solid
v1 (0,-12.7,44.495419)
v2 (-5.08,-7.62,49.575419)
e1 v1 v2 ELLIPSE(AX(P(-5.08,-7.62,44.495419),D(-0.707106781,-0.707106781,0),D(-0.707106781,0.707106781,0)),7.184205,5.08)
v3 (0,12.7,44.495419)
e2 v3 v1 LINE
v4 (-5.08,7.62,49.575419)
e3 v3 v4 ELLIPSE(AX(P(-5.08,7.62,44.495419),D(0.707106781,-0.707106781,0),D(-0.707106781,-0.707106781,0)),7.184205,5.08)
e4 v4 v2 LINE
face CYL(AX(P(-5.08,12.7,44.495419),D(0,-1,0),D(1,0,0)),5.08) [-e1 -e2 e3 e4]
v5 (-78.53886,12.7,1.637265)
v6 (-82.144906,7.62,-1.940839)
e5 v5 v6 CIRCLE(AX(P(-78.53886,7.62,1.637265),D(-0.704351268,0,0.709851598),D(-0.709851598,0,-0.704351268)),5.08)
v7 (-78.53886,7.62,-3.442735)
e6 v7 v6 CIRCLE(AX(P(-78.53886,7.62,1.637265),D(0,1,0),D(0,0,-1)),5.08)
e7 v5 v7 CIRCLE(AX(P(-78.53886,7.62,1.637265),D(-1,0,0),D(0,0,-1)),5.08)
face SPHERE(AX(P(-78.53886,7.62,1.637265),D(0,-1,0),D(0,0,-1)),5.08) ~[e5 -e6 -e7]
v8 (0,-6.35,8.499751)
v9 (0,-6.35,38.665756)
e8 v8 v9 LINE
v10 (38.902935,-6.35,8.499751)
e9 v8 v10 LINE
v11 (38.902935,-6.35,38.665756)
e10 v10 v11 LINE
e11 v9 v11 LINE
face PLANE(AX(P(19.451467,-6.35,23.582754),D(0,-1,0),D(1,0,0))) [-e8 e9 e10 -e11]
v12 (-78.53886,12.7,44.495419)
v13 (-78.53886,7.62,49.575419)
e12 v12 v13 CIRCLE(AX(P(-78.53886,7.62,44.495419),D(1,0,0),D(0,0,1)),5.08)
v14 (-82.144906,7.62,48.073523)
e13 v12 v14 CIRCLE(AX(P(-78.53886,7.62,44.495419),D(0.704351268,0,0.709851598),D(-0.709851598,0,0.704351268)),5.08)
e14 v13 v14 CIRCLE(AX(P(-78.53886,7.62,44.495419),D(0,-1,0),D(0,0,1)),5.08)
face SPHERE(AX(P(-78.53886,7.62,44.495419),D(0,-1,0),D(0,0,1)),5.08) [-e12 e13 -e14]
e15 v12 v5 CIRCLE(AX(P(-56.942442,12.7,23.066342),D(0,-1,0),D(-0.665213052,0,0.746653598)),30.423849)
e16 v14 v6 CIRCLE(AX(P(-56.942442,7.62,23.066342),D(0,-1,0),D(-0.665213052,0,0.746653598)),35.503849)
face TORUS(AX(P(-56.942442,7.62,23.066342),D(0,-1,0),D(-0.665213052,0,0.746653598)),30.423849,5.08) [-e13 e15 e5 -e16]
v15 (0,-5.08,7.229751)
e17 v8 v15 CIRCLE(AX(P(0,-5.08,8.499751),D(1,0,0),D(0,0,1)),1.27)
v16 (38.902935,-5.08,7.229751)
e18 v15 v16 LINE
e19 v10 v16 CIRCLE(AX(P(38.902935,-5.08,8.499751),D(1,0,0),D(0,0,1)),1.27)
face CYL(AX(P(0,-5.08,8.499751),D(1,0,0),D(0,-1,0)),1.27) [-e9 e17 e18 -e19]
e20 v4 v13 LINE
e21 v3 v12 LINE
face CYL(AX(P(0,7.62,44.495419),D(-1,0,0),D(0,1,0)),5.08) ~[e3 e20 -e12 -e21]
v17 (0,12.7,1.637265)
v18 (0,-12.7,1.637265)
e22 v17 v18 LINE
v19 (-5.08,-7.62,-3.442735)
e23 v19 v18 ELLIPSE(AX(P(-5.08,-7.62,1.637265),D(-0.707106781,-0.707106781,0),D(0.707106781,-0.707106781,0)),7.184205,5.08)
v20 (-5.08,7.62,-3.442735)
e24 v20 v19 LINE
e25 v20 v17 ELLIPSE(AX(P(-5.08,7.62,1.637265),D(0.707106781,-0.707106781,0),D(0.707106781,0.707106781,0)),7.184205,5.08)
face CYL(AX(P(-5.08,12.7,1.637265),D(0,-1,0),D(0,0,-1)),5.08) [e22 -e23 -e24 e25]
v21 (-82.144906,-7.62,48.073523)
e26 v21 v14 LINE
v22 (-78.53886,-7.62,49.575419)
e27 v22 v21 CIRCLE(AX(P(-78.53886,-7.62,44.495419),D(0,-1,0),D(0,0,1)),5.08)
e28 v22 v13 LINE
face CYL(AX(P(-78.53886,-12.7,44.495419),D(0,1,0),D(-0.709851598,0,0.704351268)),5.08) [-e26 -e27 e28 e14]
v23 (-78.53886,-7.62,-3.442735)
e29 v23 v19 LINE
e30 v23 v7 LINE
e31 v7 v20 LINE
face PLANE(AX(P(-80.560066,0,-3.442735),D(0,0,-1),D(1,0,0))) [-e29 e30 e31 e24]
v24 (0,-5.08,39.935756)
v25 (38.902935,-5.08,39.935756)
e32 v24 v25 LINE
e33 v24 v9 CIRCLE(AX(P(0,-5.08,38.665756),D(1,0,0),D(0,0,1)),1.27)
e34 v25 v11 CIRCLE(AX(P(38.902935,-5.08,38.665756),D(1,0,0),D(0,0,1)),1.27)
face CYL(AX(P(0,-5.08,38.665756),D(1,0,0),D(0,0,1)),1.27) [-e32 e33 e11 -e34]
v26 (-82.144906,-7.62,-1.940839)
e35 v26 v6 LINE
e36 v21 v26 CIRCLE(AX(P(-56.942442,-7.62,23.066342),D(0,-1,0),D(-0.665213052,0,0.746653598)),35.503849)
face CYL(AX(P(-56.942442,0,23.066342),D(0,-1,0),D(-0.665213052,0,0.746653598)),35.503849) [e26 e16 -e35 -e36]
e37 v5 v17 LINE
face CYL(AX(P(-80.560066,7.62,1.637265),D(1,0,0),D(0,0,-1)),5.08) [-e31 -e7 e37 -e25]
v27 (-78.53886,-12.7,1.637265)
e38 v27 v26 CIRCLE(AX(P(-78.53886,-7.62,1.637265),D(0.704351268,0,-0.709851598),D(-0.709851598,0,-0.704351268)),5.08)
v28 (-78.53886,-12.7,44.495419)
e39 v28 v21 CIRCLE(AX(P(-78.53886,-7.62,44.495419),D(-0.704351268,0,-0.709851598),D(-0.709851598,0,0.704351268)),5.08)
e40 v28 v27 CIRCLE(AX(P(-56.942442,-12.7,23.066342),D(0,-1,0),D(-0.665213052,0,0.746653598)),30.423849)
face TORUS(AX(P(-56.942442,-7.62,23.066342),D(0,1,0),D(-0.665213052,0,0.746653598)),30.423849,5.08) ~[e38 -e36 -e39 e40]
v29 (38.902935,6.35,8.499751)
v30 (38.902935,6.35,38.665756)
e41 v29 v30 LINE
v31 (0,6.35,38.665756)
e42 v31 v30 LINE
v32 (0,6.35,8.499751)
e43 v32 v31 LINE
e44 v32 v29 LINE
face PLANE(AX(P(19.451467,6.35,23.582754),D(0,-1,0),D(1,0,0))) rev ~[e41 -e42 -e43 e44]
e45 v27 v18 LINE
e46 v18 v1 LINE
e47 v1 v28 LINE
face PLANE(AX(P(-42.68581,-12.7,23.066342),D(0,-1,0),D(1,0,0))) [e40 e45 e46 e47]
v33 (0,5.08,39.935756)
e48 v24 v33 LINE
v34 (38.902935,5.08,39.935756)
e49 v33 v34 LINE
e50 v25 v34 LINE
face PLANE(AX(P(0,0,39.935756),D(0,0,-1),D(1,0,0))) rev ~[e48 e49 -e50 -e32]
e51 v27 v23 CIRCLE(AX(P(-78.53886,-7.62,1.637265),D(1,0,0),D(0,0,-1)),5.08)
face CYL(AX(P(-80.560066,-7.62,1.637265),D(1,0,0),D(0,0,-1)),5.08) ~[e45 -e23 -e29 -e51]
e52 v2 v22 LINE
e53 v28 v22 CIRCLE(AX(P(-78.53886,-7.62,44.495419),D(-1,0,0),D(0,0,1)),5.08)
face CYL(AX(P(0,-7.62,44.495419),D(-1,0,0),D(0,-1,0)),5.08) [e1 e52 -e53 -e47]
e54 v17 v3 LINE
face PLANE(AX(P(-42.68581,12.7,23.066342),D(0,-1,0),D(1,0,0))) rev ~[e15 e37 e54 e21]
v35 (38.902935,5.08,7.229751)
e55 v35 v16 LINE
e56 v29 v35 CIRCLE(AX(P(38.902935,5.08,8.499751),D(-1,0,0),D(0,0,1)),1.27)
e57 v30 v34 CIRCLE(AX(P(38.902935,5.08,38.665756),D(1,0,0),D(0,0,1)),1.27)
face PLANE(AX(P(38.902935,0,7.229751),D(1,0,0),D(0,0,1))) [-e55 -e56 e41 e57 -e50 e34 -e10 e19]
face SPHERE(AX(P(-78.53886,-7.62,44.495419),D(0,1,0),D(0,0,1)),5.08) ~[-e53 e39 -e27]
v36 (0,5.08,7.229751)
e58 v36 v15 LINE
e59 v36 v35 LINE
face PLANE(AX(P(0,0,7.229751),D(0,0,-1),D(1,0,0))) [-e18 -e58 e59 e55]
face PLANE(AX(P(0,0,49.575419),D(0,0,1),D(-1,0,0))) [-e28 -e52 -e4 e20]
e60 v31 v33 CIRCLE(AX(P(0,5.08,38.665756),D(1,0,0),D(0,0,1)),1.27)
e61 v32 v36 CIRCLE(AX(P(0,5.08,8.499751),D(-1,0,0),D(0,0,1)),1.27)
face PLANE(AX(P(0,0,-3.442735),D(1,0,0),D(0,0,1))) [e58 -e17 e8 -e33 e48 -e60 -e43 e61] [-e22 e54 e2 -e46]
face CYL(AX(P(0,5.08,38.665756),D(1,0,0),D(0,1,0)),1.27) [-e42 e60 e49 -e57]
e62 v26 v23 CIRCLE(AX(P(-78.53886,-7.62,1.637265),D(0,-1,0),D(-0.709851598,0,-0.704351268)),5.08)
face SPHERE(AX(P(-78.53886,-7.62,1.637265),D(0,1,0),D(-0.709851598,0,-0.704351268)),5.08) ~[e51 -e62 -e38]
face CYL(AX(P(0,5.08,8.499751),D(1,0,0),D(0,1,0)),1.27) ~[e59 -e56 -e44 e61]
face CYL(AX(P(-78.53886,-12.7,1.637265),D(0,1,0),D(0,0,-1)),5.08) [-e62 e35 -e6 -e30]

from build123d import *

# Parameters (mm, degrees)
F2_DEPTH = 12.7
F1_W     = 38.9029346406
F1_H     = 32.7060050331
F3_DEPTH = 6.35
F4_R     = 5.08
F5_R     = 1.27


# Not quite as in the source:
# - two fillets or chamfers of one size are made in one step
# - a feature names something its author has since deleted; it is built from what else it names


with BuildPart() as f2:
    # F0 (on Front) → F2 (new body, symmetric)
    with BuildSketch(Plane.XZ):
        with BuildLine():
            Line((-80.5600658059, -3.4427349456), (0, -3.4427349456))
            Line((0, -3.4427349456), (0, 49.5754186995))
            Line((0, 49.5754186995), (-80.5600658059, 49.5754186995))
            ThreePointArc((-80.5600658059, 49.5754186995), (-92.446291157, 23.066341877), (-80.5600658059, -3.4427349456))
        make_face()
    extrude(amount=F2_DEPTH, both=True)

    # F1 (on Front) → F3 (join, symmetric)
    with BuildSketch(Plane.XZ):
        with Locations((19.4514673203, 23.5827539582)):
            Rectangle(F1_W, F1_H)
    extrude(amount=F3_DEPTH, both=True)

    # F4
    f4_edges = [f2.edges().sort_by_distance(p)[0] for p in [
        (-40.280033, -12.7, -3.442735),
        (-40.280033, -12.7, 49.575419),
        (-40.280033, 12.7, -3.442735),
        (-40.280033, 12.7, 49.575419),
        (-92.446291, 12.7, 23.066342),
        (-80.560066, 0, -3.442735),
        (-92.446291, -12.7, 23.066342),
        (-80.560066, 0, 49.575419),
        (0, 0, -3.442735),
        (0, 0, 49.575419),
    ]]
    fillet(f4_edges, radius=F4_R)

    # F5
    f5_edges = [f2.edges().sort_by_distance(p)[0] for p in [
        (19.451467, -6.35, 39.935756),
        (19.451467, -6.35, 7.229751),
        (19.451467, 6.35, 39.935756),
        (19.451467, 6.35, 7.229751),
    ]]
    fillet(f5_edges, radius=F5_R)


solid = f2.part
